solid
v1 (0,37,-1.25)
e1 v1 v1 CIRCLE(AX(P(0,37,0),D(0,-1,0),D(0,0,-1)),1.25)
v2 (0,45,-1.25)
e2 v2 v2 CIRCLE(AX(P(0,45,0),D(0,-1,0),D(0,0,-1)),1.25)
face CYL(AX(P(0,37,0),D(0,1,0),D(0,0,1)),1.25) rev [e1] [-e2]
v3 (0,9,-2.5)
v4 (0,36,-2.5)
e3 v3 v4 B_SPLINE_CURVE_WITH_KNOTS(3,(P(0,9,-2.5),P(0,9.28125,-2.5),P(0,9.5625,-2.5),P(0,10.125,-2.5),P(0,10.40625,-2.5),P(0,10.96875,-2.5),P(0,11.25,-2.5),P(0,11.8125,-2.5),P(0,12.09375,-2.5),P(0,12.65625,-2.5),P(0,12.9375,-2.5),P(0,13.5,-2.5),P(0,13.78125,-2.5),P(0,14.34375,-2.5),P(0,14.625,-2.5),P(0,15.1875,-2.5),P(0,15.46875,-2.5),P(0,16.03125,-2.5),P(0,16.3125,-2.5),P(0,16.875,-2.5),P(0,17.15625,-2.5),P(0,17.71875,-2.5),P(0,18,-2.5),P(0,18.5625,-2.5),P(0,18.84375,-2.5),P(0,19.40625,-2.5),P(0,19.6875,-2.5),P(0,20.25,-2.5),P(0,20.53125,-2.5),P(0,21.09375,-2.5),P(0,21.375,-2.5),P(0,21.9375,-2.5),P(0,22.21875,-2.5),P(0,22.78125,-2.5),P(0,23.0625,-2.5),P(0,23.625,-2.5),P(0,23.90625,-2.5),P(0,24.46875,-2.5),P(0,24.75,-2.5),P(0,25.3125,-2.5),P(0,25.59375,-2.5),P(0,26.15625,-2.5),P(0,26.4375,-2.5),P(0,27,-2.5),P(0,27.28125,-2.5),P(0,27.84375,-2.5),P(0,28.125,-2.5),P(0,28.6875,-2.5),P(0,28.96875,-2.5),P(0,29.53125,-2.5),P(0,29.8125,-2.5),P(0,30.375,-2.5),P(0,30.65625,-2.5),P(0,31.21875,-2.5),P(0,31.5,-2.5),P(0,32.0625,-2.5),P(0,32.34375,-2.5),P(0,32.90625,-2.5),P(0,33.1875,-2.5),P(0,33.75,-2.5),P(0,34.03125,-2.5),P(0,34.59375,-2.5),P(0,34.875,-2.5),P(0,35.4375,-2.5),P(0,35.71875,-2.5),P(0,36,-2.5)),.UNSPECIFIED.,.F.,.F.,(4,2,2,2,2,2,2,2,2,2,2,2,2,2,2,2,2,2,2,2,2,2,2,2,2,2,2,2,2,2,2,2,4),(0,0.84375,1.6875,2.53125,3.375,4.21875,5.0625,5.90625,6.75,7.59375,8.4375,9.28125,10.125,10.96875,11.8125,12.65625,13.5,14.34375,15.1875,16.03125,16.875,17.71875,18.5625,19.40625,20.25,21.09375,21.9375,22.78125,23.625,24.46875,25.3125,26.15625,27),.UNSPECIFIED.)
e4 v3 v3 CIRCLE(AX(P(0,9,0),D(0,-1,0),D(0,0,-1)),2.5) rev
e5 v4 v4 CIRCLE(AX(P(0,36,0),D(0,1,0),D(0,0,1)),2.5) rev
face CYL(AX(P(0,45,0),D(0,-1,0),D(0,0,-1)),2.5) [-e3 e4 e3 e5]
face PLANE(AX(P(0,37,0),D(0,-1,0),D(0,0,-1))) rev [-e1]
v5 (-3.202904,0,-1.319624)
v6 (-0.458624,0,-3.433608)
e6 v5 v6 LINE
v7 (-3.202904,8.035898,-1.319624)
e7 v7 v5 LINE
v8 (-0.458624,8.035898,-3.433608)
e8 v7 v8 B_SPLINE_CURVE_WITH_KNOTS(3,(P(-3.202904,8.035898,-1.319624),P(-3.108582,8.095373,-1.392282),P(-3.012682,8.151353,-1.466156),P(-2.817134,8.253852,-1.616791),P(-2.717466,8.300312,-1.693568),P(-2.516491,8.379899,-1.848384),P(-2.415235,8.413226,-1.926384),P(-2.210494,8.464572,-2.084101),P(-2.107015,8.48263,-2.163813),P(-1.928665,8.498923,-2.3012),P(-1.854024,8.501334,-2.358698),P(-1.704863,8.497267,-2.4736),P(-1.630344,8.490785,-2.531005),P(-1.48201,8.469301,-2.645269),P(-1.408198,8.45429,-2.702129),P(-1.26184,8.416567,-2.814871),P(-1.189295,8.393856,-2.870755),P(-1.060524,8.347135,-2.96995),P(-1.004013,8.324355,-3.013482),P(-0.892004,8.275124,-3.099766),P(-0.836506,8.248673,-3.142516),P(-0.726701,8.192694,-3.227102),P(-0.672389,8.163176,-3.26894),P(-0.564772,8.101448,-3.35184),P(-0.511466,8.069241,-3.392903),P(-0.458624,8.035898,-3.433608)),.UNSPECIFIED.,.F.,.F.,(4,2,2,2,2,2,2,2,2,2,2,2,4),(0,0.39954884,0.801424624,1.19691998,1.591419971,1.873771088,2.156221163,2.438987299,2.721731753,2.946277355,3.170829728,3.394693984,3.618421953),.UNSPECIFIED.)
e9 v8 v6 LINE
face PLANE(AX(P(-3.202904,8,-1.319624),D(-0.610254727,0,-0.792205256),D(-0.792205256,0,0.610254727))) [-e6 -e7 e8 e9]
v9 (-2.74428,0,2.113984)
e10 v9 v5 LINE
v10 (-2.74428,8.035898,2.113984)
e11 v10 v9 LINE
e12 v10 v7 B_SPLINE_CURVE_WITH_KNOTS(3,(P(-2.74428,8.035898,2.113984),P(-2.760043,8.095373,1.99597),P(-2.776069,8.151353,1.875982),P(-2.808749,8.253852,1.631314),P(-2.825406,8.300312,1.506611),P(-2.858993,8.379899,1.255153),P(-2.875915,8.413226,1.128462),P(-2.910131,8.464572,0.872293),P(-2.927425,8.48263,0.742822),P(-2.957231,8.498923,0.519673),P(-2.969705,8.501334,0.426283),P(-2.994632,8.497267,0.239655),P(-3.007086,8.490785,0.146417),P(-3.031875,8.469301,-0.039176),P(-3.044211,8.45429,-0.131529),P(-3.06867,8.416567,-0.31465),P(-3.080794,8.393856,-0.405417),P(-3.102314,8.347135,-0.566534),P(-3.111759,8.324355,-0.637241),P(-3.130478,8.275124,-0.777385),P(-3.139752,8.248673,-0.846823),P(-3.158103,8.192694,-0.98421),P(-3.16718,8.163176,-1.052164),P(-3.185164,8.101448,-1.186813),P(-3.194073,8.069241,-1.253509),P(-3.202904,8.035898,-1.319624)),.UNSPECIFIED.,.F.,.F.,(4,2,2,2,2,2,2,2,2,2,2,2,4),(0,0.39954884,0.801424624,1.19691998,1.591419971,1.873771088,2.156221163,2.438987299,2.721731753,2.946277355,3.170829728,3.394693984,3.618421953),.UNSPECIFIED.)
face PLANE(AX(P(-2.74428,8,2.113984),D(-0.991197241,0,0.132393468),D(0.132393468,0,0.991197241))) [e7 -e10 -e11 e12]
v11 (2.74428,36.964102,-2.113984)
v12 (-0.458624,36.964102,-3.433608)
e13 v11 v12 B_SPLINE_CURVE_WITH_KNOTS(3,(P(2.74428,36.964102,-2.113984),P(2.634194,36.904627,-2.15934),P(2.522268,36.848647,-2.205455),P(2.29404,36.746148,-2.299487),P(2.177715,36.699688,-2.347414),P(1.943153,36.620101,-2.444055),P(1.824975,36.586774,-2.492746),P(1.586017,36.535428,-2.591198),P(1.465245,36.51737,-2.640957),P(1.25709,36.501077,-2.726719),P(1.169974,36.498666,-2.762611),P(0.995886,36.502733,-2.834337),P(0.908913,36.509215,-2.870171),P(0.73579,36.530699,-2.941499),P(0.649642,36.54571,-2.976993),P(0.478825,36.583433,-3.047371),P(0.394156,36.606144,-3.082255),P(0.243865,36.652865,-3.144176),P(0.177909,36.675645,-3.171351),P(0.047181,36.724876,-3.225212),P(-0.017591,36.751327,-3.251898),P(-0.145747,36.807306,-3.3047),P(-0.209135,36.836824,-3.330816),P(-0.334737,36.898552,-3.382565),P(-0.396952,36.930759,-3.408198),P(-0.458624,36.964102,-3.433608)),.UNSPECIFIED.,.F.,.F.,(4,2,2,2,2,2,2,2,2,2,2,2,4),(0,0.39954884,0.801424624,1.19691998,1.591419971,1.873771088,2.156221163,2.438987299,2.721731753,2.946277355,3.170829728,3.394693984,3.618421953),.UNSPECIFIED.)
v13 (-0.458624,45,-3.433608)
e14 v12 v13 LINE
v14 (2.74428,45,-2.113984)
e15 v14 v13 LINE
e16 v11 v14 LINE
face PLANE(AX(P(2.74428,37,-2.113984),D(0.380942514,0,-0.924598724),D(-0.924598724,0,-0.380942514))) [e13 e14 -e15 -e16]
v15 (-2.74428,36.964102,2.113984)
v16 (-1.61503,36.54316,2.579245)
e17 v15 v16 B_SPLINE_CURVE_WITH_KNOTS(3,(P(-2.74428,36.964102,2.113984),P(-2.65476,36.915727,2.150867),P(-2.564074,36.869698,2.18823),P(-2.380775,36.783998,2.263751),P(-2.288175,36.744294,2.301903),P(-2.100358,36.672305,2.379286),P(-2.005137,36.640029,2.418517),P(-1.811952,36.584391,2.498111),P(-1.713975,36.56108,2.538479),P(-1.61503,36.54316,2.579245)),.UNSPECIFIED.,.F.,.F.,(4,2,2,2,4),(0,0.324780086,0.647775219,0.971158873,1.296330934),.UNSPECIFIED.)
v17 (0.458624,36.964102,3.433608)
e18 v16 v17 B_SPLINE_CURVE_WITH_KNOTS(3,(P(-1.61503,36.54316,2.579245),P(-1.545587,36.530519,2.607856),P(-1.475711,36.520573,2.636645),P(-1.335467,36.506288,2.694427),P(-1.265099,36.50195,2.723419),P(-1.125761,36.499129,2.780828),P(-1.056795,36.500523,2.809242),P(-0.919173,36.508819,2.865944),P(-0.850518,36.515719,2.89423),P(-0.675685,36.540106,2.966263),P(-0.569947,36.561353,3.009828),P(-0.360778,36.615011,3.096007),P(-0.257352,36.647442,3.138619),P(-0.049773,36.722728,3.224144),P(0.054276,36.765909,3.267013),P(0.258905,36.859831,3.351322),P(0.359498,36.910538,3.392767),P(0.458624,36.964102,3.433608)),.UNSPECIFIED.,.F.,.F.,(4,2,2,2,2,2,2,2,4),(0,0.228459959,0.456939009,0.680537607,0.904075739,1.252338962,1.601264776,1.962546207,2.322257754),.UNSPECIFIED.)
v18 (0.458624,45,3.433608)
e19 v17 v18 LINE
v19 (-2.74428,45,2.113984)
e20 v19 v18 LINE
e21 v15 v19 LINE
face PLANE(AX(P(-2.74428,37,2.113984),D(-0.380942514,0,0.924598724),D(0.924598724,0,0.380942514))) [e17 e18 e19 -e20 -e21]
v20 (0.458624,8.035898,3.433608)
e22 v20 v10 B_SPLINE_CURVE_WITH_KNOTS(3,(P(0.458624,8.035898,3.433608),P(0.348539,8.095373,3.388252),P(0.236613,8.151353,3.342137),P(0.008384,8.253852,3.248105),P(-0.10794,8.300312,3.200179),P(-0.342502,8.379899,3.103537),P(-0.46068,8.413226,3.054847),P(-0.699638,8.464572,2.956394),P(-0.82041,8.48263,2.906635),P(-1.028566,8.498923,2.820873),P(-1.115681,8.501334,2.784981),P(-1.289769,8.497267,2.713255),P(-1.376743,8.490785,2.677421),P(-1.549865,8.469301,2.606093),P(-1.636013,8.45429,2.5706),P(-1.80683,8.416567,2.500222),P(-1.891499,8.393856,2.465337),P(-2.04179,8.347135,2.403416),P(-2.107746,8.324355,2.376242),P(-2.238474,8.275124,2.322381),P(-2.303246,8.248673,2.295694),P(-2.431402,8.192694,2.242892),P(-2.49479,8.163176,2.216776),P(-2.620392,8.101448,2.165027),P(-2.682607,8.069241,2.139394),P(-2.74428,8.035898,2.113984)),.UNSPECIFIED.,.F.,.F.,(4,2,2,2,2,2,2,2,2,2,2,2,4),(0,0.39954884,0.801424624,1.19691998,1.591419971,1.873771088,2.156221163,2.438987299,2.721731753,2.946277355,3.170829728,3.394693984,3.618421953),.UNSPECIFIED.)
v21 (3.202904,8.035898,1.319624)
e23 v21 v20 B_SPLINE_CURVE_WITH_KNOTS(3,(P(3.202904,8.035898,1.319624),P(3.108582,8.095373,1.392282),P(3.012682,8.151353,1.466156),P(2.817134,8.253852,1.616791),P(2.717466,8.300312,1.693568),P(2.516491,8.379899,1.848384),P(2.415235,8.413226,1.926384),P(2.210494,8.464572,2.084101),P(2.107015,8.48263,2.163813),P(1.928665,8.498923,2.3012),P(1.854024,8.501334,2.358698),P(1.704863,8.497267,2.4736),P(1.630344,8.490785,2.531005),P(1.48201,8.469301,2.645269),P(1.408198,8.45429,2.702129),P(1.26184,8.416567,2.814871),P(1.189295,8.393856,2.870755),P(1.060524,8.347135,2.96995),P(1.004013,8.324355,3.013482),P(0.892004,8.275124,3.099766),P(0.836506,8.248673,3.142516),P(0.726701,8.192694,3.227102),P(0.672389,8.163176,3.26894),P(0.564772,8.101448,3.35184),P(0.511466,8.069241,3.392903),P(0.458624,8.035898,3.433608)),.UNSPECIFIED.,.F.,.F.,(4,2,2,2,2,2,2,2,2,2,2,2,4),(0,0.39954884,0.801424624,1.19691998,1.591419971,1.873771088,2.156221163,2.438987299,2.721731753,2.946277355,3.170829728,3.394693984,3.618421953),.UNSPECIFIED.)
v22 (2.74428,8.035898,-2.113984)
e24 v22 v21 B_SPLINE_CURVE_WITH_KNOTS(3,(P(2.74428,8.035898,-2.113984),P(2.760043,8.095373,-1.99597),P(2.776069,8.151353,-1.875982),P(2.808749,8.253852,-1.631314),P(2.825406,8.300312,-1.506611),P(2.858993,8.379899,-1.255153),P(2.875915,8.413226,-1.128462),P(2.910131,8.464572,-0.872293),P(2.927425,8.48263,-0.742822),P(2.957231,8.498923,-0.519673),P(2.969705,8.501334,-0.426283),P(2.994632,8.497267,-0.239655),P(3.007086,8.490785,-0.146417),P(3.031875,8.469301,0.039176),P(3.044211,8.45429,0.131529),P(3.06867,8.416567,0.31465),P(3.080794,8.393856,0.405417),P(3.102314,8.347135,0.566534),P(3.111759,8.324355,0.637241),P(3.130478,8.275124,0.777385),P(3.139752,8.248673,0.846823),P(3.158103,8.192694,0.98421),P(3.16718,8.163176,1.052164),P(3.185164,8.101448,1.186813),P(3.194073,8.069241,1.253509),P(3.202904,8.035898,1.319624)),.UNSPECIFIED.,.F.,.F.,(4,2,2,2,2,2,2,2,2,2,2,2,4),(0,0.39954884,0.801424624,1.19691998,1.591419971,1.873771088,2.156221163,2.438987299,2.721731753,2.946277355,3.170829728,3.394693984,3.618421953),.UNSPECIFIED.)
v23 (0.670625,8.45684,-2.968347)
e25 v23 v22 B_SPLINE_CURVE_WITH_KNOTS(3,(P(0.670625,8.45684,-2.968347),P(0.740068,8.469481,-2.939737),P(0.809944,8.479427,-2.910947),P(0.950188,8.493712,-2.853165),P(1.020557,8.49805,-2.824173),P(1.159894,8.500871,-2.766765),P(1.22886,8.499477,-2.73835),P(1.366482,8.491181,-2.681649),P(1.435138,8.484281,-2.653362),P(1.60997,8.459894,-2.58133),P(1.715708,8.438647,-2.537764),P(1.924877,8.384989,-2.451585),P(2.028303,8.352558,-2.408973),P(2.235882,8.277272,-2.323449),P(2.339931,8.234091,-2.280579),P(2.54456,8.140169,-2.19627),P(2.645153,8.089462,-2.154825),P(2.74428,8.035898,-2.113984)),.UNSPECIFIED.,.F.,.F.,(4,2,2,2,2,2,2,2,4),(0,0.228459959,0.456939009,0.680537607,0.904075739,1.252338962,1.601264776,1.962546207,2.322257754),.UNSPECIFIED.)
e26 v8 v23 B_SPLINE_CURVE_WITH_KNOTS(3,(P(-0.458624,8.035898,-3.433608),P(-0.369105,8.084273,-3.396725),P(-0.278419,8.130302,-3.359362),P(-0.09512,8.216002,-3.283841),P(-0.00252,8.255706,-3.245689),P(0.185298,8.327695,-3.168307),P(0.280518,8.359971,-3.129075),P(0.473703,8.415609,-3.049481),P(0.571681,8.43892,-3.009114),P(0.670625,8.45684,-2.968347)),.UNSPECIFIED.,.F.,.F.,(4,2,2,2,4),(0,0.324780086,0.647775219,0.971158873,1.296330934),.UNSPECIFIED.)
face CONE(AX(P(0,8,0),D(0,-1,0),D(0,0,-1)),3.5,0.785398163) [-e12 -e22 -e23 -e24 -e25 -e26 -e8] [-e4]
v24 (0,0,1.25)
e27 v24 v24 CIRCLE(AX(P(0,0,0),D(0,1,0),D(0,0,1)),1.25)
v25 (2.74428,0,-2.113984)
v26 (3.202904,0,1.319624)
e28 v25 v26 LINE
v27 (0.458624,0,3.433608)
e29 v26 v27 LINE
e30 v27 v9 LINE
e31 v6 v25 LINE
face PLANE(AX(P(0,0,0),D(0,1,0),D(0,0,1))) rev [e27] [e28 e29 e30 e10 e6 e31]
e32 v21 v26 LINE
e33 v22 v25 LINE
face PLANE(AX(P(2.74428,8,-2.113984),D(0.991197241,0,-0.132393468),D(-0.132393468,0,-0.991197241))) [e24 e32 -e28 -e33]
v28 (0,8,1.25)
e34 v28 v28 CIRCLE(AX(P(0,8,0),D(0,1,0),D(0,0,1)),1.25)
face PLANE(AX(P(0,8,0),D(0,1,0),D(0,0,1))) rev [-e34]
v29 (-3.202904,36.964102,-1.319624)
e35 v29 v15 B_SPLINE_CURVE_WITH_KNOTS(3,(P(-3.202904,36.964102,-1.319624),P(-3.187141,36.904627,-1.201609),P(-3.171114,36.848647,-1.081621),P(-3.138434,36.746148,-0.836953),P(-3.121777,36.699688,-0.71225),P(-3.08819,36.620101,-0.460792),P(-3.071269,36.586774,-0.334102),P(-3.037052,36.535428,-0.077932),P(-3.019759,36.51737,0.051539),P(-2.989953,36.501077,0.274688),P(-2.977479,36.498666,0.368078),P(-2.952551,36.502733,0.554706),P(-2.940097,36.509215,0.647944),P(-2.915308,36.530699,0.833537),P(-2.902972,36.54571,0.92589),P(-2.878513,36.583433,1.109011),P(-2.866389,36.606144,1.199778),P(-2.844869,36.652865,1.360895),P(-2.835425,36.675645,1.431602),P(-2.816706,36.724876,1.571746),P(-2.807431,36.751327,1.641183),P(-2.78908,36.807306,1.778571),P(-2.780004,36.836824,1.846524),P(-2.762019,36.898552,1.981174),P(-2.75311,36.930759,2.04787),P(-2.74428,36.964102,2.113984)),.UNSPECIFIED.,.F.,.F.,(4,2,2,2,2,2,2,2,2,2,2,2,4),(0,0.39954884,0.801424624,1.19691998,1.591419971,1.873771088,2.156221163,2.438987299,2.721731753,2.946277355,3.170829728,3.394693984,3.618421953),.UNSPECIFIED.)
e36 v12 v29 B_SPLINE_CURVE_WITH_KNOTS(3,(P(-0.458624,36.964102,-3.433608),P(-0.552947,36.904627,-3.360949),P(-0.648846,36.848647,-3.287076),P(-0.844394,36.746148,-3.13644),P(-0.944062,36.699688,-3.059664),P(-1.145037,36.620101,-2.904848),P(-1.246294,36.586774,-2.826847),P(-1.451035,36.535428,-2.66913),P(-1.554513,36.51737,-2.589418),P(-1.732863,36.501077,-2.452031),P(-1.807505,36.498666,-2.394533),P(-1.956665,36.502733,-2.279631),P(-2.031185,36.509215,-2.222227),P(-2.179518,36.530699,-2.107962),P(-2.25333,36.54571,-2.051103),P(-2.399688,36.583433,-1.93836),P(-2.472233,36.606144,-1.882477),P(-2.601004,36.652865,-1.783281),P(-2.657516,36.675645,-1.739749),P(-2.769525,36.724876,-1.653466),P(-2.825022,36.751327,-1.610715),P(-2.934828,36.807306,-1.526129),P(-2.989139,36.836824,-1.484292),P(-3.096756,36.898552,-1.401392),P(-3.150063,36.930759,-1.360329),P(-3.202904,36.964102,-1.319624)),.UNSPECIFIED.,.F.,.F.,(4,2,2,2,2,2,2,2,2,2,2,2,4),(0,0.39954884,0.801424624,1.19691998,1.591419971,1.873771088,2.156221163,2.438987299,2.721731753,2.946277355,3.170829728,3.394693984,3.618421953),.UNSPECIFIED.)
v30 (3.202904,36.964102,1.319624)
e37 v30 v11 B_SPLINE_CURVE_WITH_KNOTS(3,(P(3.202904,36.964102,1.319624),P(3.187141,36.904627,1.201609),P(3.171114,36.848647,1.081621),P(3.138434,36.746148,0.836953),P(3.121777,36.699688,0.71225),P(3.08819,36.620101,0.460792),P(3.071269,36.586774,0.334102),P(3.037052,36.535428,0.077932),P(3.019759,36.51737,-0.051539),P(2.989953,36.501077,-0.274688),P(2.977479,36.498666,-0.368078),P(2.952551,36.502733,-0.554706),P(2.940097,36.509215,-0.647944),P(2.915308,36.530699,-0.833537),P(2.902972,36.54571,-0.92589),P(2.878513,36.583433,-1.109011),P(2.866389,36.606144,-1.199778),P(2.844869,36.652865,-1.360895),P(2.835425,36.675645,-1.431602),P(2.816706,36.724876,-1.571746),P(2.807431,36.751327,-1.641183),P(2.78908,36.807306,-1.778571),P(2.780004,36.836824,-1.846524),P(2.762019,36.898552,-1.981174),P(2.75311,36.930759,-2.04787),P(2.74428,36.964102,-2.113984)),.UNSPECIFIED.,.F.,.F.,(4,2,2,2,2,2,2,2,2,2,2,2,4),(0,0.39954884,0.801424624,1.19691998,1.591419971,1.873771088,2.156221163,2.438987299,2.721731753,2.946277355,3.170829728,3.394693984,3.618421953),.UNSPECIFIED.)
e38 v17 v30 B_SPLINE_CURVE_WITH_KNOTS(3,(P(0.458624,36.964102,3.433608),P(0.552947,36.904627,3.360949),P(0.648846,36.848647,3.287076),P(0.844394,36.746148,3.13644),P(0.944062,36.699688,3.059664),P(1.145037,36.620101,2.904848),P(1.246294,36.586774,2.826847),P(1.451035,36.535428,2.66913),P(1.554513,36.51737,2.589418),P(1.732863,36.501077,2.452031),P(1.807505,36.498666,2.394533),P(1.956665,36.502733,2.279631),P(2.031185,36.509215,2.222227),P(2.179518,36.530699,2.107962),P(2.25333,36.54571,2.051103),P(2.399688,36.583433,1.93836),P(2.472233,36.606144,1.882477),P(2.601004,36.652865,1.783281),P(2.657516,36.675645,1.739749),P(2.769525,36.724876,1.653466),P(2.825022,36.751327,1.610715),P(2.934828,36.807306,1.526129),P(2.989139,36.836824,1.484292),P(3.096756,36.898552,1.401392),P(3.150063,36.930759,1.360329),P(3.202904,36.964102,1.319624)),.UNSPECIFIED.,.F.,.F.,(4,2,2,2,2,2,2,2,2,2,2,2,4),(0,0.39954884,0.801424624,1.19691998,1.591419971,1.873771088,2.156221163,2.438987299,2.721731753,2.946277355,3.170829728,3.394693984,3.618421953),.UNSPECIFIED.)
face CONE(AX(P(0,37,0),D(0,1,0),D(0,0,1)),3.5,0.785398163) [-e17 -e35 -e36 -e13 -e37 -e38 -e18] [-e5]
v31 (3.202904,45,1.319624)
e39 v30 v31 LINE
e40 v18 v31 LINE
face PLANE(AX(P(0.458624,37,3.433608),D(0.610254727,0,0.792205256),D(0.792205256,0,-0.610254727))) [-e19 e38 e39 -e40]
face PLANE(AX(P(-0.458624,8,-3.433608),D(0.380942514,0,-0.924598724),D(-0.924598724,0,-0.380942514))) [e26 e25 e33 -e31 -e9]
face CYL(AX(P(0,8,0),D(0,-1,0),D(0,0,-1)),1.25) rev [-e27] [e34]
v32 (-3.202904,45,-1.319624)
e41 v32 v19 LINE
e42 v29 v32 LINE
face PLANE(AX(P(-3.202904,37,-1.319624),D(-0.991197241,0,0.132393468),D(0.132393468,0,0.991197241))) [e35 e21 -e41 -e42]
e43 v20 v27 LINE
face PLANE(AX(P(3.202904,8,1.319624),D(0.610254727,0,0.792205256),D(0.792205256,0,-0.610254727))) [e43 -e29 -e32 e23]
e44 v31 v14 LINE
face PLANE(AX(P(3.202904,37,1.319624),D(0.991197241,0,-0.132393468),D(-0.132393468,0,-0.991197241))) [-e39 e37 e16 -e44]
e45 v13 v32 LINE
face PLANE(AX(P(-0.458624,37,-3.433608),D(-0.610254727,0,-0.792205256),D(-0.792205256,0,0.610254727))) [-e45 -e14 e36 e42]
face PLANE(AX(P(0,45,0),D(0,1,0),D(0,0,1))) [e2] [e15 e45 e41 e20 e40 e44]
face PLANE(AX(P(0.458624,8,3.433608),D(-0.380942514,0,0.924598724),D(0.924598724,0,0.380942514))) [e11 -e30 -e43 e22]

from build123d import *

# Parameters (mm, degrees)
SKETCH_1_R          = 2.5
EXTRUDE_1_DEPTH     = 45
EXTRUDE_2_DEPTH     = 8
EXTRUDE_3_DEPTH     = 8
CHAMFER_1_SIZE      = 1
SKETCH_4_R          = 1.25
CUT_EXTRUDE_1_DEPTH = 8
CUT_EXTRUDE_START   = 8
SKETCH_5_R          = 1.25
CUT_EXTRUDE_2_DEPTH = 8


with BuildPart() as part:
    # 草图1 → 凸台-拉伸1 (new body)
    with BuildSketch(Plane(origin=(0, 0, 0), x_dir=(1, 0, 0), z_dir=(0, 1, 0))):
        with Locations(Location((0, 0, 0), (0, 0, 90))):
            Circle(SKETCH_1_R)
    extrude(amount=EXTRUDE_1_DEPTH)

    # 草图2 → 凸台-拉伸2 (add)
    with BuildSketch(Plane(origin=(0, 45, 0), x_dir=(1, 0, 0), z_dir=(0, 1, 0))):
        Polygon((3.202903935, -1.319623577), (2.744279509, 2.113984385), (-0.458624426, 3.433607962), (-3.202903935, 1.319623577), (-2.744279509, -2.113984385), (0.458624426, -3.433607962), align=None)
    extrude(amount=-EXTRUDE_2_DEPTH)

    # 草图3 → 凸台-拉伸3 (add)
    with BuildSketch(Plane.XZ):
        Polygon((3.202903935, 1.319623577), (0.458624426, 3.433607962), (-2.744279509, 2.113984385), (-3.202903935, -1.319623577), (-0.458624426, -3.433607962), (2.744279509, -2.113984385), align=None)
    extrude(amount=-EXTRUDE_3_DEPTH)

    # 倒角1
    # the kernel refuses this chamfer: 1 mm, written as the material it adds along each edge
    with BuildSketch(Plane(origin=(0, 37, 0), x_dir=(0, 0, -1), z_dir=(-1, 0, 0))) as chamfer_1_piece_1_section:
        Polygon((2.5, CHAMFER_1_SIZE), (2.5 + CHAMFER_1_SIZE, 0), (2.5, 0), align=None)
    chamfer_1_piece_1 = revolve(axis=Axis((0, 37, 0), (0, -1, 0)), mode=Mode.PRIVATE)
    chamfer_1_piece_1 = split(chamfer_1_piece_1, bisect_by=Plane(origin=(3.361202761, 36.482096178, 2.504767848), z_dir=(-0.9911972405355005, 0, 0.13239346794615373)), keep=Keep.TOP, mode=Mode.PRIVATE)
    chamfer_1_piece_1 = split(chamfer_1_piece_1, bisect_by=Plane(origin=(0.402796537, 36.482096178, 3.476613525), z_dir=(-0.61025472680424, 0, -0.7922052564917015)), keep=Keep.TOP, mode=Mode.PRIVATE)
    chamfer_1_piece_1 = split(chamfer_1_piece_1, bisect_by=Plane(origin=(2.183184145, 36.482096178, -2.345160432), z_dir=(-0.3809425137312606, 0, 0.924598724437855)), keep=Keep.TOP, mode=Mode.PRIVATE)
    chamfer_1_piece_1 = split(chamfer_1_piece_1, bisect_by=Plane(origin=(-0.102470937, 36.482096178, 3.202431915), z_dir=(0.38094251373126053, 0, -0.924598724437855)), keep=Keep.TOP, mode=Mode.PRIVATE)
    chamfer_1_piece_1 = split(chamfer_1_piece_1, bisect_by=Plane(origin=(-3.258731824, 36.482096178, -1.276618014), z_dir=(0.6102547268042401, 0, 0.7922052564917015)), keep=Keep.TOP, mode=Mode.PRIVATE)
    chamfer_1_piece_1 = split(chamfer_1_piece_1, bisect_by=Plane(origin=(-2.585980682, 36.482096178, 3.299128656), z_dir=(0.9911972405355005, 0, -0.1323934679461537)), keep=Keep.TOP, mode=Mode.PRIVATE)
    add(chamfer_1_piece_1)
    with BuildSketch(Plane(origin=(0, 8, 0), x_dir=(0, 0, -1), z_dir=(-1, 0, 0))) as chamfer_1_piece_2_section:
        Polygon((2.5 + CHAMFER_1_SIZE, 0), (2.5, -CHAMFER_1_SIZE), (2.5, 0), align=None)
    chamfer_1_piece_2 = revolve(axis=Axis((0, 8, 0), (0, -1, 0)), mode=Mode.PRIVATE)
    chamfer_1_piece_2 = split(chamfer_1_piece_2, bisect_by=Plane(origin=(0.402796537, 8.517903822, 3.476613525), z_dir=(-0.61025472680424, 0, -0.7922052564917015)), keep=Keep.TOP, mode=Mode.PRIVATE)
    chamfer_1_piece_2 = split(chamfer_1_piece_2, bisect_by=Plane(origin=(3.361202761, 8.517903822, 2.504767848), z_dir=(-0.9911972405355005, 0, 0.13239346794615373)), keep=Keep.TOP, mode=Mode.PRIVATE)
    chamfer_1_piece_2 = split(chamfer_1_piece_2, bisect_by=Plane(origin=(-0.102470937, 8.517903822, 3.202431915), z_dir=(0.38094251373126053, 0, -0.924598724437855)), keep=Keep.TOP, mode=Mode.PRIVATE)
    chamfer_1_piece_2 = split(chamfer_1_piece_2, bisect_by=Plane(origin=(2.183184145, 8.517903822, -2.345160432), z_dir=(-0.3809425137312606, 0, 0.924598724437855)), keep=Keep.TOP, mode=Mode.PRIVATE)
    chamfer_1_piece_2 = split(chamfer_1_piece_2, bisect_by=Plane(origin=(-2.585980682, 8.517903822, 3.299128656), z_dir=(0.9911972405355005, 0, -0.1323934679461537)), keep=Keep.TOP, mode=Mode.PRIVATE)
    chamfer_1_piece_2 = split(chamfer_1_piece_2, bisect_by=Plane(origin=(-3.258731824, 8.517903822, -1.276618014), z_dir=(0.6102547268042401, 0, 0.7922052564917015)), keep=Keep.TOP, mode=Mode.PRIVATE)
    add(chamfer_1_piece_2)

    # 草图4 → 切除-拉伸1 (cut)
    with BuildSketch(Plane(origin=(0, 0, 0), x_dir=(-1, 0, 0), z_dir=(0, 1, 0))):
        with Locations(Location((0, 0, 0), (0, 0, 90))):
            Circle(SKETCH_4_R)
    extrude(amount=CUT_EXTRUDE_1_DEPTH, mode=Mode.SUBTRACT)

    # 草图5 → 切除-拉伸2 (cut)
    with BuildSketch(Plane(origin=(0, 45, 0), x_dir=(-1, 0, 0), z_dir=(0, -1, 0)).offset(CUT_EXTRUDE_START)):
        with Locations(Location((0, 0, 0), (0, 0, 270))):
            Circle(SKETCH_5_R)
    extrude(amount=-CUT_EXTRUDE_2_DEPTH, mode=Mode.SUBTRACT)


solid = part.part
